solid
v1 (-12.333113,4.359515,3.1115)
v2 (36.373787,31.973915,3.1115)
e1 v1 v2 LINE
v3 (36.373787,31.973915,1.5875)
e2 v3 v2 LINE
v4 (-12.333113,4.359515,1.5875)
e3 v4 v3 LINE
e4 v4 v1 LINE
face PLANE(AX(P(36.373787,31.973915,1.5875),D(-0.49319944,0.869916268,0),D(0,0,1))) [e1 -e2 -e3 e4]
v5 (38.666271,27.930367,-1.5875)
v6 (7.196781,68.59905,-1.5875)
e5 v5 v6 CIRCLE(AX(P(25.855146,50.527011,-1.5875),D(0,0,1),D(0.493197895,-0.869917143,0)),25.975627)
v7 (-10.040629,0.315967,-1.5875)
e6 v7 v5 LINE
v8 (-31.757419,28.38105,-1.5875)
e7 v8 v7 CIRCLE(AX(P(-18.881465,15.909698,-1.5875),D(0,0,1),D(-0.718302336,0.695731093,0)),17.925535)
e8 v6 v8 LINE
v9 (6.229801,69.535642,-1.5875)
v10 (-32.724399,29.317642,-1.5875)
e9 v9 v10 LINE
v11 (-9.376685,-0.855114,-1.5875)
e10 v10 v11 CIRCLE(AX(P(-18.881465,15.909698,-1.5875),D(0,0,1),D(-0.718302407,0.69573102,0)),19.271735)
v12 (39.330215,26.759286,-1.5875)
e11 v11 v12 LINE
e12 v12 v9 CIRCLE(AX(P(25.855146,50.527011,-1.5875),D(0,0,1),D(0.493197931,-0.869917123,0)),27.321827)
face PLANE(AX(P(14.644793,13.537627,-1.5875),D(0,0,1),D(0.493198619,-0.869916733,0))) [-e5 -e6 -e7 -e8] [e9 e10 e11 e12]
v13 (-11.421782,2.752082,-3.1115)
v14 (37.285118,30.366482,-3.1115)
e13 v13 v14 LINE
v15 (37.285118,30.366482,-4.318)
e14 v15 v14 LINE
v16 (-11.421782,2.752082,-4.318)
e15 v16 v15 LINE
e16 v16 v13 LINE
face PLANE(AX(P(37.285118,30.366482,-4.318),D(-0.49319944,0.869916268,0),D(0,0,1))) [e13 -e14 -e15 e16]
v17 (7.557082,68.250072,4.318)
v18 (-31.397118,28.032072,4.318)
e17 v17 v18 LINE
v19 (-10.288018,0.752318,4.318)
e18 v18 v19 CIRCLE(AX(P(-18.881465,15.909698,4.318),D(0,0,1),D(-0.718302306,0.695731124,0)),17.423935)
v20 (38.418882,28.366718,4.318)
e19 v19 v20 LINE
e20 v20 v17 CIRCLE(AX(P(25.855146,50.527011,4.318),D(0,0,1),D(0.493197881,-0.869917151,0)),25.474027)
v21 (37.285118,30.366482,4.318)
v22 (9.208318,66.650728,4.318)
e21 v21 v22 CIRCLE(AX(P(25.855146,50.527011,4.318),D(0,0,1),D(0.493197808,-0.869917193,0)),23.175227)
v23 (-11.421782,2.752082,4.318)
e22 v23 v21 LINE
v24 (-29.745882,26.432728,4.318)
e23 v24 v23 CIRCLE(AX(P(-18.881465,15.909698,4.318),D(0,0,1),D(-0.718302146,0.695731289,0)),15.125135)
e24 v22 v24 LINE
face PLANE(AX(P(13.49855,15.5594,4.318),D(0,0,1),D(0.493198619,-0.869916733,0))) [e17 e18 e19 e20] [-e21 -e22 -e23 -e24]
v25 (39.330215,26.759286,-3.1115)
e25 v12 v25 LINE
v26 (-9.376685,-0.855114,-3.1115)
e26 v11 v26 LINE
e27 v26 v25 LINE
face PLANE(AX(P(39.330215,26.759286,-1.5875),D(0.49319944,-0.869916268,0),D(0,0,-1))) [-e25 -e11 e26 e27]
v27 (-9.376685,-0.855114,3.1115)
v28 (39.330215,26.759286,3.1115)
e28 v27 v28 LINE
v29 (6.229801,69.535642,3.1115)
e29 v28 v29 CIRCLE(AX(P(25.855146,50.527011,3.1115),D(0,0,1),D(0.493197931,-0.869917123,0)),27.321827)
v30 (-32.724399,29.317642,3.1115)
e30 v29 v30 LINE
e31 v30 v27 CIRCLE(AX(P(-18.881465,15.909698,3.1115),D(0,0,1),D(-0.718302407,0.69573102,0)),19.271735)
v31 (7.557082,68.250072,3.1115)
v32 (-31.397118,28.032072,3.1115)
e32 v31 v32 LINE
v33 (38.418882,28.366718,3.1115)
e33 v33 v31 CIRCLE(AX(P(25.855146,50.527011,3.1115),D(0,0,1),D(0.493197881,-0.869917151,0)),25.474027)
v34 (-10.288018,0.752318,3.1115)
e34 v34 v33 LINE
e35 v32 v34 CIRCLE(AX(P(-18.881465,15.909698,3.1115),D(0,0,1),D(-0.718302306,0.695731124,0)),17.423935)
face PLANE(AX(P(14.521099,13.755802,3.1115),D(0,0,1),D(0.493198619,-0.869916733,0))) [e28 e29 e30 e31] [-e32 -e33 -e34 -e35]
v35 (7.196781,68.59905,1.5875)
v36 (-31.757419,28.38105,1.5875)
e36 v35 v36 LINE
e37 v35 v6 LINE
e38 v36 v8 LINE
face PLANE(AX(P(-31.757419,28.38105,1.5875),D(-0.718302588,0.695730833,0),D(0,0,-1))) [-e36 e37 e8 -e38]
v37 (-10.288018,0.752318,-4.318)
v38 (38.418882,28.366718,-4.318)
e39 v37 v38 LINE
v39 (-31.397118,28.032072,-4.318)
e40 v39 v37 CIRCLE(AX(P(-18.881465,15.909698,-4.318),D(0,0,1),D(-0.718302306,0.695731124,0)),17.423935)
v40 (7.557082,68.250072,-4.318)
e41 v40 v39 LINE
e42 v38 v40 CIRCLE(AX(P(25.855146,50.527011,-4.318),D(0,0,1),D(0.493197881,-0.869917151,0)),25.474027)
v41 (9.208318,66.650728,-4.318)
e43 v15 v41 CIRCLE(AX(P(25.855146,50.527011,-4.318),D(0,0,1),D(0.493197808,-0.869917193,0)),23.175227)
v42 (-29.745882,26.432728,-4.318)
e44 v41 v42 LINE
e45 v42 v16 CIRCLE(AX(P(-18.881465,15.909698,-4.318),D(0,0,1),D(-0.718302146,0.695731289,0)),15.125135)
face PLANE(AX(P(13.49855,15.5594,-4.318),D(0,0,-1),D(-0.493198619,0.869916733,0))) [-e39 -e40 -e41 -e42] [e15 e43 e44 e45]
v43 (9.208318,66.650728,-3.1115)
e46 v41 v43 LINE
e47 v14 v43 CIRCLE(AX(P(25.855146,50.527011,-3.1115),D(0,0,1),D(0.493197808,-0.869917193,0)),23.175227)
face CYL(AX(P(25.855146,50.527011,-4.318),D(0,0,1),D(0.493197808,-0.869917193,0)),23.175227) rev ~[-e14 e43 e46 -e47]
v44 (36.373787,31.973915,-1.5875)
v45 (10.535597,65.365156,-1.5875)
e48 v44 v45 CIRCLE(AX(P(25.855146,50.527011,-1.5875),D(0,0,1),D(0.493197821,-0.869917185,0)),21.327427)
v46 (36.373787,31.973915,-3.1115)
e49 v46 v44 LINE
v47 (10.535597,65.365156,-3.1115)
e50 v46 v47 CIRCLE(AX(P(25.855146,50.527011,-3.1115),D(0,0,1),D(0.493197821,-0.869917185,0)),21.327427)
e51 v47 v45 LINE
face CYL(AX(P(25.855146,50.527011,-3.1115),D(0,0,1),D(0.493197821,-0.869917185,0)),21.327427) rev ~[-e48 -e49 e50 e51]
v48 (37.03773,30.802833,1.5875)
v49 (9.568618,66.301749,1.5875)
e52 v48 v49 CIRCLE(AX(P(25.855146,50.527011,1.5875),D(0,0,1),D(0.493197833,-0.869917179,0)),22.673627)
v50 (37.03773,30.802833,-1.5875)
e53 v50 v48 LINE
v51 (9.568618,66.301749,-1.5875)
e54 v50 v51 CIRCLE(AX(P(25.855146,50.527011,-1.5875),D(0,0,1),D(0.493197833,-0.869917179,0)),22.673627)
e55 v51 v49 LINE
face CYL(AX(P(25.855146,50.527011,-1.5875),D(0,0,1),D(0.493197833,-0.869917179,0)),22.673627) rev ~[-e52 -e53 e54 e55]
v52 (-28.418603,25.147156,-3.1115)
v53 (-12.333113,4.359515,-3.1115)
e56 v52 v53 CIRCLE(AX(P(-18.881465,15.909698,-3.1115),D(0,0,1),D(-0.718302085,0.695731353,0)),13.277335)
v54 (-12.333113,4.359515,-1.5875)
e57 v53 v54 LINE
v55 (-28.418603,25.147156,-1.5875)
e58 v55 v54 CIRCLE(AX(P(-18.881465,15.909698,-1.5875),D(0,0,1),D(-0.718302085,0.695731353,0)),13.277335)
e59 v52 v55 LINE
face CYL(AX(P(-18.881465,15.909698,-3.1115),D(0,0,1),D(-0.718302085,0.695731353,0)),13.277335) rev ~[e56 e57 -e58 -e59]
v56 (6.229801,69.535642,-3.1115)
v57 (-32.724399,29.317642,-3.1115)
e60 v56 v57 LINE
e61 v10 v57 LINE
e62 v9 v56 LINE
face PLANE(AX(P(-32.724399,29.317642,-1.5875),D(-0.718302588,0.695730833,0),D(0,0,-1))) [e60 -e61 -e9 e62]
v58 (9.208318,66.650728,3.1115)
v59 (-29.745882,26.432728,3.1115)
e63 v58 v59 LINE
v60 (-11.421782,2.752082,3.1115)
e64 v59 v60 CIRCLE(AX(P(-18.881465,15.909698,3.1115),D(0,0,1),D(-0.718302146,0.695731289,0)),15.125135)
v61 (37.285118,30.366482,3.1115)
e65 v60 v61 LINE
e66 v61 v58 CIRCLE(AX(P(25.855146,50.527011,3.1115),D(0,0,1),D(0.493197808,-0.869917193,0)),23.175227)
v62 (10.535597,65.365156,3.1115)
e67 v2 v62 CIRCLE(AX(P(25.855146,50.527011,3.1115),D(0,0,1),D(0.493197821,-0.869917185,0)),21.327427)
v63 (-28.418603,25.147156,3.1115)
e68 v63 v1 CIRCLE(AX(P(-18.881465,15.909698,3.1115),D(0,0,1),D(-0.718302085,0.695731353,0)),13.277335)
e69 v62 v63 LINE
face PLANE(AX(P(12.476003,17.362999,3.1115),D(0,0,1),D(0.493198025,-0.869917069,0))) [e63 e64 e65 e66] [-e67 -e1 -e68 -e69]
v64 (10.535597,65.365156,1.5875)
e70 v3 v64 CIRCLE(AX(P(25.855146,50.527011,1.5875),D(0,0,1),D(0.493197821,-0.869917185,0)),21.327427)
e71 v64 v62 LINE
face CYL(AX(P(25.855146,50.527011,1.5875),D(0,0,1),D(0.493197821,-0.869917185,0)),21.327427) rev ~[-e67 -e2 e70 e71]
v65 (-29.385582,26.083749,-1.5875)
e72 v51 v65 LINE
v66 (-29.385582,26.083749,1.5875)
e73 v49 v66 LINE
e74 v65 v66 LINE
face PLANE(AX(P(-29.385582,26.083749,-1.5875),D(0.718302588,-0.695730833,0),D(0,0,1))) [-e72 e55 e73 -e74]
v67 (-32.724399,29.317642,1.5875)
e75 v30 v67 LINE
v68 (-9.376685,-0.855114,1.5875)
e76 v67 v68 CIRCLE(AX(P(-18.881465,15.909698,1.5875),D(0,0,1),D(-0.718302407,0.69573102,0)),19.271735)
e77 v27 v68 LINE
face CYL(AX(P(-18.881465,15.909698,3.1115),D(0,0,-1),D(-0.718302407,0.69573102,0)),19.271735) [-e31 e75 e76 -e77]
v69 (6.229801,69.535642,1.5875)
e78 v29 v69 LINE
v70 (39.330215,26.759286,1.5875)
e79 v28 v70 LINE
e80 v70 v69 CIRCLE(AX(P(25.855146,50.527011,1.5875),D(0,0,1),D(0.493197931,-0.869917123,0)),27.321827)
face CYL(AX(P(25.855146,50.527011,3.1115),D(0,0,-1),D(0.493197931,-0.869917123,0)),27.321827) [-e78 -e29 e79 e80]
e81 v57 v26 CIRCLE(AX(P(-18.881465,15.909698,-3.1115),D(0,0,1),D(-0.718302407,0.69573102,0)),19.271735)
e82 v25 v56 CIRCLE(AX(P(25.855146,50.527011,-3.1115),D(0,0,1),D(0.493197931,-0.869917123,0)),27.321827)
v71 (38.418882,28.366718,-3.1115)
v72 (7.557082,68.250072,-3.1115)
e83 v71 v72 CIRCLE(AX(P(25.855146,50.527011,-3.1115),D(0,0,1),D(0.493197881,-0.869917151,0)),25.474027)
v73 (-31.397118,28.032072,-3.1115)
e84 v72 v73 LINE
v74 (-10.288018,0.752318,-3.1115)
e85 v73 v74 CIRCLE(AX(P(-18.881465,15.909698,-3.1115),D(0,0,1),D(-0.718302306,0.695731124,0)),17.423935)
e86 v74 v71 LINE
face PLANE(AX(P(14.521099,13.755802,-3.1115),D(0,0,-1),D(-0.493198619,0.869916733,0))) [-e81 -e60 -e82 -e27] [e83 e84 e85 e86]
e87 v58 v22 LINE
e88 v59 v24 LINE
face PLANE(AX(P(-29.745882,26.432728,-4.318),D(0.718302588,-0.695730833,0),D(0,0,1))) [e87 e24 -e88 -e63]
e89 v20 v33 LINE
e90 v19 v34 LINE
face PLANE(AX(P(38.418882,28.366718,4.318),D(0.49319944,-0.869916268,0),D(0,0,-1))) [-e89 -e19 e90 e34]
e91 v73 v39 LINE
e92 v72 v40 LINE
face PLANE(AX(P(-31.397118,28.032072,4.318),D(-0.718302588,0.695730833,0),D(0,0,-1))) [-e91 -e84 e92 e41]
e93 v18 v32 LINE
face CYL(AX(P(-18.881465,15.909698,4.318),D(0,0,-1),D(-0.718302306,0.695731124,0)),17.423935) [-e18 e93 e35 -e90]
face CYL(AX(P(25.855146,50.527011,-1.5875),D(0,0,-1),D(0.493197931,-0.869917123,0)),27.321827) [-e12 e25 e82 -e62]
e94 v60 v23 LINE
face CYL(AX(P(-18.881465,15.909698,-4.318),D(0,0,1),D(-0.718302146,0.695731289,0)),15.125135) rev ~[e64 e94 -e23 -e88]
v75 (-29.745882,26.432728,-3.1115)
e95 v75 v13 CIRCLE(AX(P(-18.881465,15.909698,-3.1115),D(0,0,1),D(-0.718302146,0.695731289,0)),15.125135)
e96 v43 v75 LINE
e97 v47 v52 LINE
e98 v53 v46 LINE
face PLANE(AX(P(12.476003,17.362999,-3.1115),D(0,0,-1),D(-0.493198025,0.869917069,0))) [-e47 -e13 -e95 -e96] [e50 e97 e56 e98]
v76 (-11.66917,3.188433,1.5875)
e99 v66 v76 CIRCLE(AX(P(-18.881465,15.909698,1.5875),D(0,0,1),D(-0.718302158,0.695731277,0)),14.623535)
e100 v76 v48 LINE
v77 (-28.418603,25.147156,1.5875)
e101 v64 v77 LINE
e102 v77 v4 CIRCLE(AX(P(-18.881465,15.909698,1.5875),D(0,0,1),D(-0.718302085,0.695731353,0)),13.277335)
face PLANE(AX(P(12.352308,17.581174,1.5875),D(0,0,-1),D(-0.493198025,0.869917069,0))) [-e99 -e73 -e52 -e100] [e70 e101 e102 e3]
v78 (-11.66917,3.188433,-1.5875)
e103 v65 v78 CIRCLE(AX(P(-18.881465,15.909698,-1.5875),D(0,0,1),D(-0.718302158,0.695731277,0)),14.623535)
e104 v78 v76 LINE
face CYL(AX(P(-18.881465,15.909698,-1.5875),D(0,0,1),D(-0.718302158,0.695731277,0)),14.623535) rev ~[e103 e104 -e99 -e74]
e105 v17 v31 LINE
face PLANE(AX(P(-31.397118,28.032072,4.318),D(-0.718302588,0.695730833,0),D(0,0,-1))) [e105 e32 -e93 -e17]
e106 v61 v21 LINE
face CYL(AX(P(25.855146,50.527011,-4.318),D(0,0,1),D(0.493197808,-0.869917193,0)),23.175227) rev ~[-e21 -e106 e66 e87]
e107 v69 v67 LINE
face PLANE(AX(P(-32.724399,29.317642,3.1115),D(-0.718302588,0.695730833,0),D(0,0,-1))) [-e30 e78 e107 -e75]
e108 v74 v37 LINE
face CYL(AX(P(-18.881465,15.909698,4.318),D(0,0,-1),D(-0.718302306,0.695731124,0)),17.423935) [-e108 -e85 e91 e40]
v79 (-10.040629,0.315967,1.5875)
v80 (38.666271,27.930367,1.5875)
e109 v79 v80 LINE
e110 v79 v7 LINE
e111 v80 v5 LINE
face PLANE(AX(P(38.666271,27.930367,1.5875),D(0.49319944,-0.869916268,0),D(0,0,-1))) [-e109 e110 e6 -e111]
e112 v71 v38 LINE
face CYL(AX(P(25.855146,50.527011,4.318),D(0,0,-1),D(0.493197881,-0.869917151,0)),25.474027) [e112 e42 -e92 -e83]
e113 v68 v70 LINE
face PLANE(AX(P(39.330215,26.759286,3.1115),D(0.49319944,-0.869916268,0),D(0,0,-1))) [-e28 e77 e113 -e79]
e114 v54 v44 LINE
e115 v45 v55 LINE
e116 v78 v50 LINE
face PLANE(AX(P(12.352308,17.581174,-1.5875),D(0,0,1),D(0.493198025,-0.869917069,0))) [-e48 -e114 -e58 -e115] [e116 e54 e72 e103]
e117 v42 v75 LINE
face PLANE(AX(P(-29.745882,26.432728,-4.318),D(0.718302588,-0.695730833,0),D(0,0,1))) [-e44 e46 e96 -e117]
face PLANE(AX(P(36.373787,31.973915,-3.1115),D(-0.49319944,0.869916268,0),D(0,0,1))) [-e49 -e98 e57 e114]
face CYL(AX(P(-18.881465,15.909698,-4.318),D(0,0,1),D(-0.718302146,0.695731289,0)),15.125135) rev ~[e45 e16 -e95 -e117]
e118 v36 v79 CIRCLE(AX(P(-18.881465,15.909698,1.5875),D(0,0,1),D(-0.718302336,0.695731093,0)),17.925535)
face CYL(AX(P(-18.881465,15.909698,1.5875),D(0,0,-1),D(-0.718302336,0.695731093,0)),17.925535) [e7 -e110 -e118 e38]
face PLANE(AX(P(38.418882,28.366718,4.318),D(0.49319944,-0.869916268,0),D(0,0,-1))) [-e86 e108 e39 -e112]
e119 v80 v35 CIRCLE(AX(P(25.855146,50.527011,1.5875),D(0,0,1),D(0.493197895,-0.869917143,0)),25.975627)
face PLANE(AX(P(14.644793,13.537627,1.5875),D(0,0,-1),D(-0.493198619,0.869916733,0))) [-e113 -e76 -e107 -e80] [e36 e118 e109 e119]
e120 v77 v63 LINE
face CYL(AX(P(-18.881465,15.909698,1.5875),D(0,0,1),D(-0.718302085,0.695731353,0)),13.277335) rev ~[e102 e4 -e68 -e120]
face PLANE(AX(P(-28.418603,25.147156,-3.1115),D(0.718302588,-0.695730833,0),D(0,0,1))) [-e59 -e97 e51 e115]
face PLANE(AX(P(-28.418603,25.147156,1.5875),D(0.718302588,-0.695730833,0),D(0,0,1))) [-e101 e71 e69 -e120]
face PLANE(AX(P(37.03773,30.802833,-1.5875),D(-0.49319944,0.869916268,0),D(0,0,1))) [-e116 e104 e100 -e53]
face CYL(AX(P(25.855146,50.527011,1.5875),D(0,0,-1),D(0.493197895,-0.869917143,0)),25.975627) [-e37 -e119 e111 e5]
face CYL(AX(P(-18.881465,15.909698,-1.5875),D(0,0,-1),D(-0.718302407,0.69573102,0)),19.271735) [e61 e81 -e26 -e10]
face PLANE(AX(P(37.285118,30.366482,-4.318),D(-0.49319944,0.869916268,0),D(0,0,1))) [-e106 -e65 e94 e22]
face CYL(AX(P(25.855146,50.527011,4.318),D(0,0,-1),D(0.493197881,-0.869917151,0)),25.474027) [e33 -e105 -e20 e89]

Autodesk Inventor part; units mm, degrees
ref_plane "РабПлоскость2" through (-18.8815, 15.9097, 0) normal (-1, 0, 0) x (0, 0, 1)
ref_plane "РабПлоскость3" through (25.8552, 50.527, 0) normal (-0.7364465, -0.6764958, 0) x (0, 0, 1)
sketch "Траектория" plane through (0, 0, 0) normal (0, 0, 1) x (1, 0, 0)
  arc A0 (-30.5715, 27.2324) -> (-10.8549, 1.7522) centre (-18.8815, 15.9097) ccw
  arc A1 (37.852, 29.3666) -> (8.3827, 67.4504) centre (25.8552, 50.527) ccw
  line L0 (37.852, 29.3666) -> (-10.8549, 1.7522)
  line L1 (-30.5715, 27.2324) -> (8.3827, 67.4504)
  dimension "d31" = 5.9944
ref_plane "Секущая плоскость" through (-10.8549, 1.7522, 0) normal (0.8699167, 0.4931986, 0) x (0, 0, 1)
sketch "Эскиз сечения" plane through (-10.8549, 1.7522, 0) normal (0.8699167, 0.4931986, 0) x (0, 0, 1)
  line L0 (-4.318, -1.1494) -> (4.318, -1.1494)
  line L1 (4.318, -1.1494) -> (4.318, 1.1494)
  line L2 (4.318, 1.1494) -> (-4.318, 1.1494)
  line L3 (-4.318, 1.1494) -> (-4.318, -1.1494)
  line L4 (-1.5875, -1.651) -> (1.5875, -1.651)
  line L5 (1.5875, -1.651) -> (1.5875, 1.651)
  line L6 (1.5875, 1.651) -> (-1.5875, 1.651)
  line L7 (-1.5875, 1.651) -> (-1.5875, -1.651)
  line L8 (-1.5875, 0) -> (1.5875, 0) construction
  line L9 (-3.1115, -2.9972) -> (-1.5875, -2.9972)
  line L10 (-1.5875, -2.9972) -> (-1.5875, 2.9972)
  line L11 (-1.5875, 2.9972) -> (-3.1115, 2.9972)
  line L12 (-3.1115, 2.9972) -> (-3.1115, -2.9972)
  line L13 (1.5875, -2.9972) -> (3.1115, -2.9972)
  line L14 (3.1115, -2.9972) -> (3.1115, 2.9972)
  line L15 (3.1115, 2.9972) -> (1.5875, 2.9972)
  line L16 (1.5875, 2.9972) -> (1.5875, -2.9972)
  line L17 (-4.318, 0) -> (4.318, 0) construction
  point P0 (0, 0)
  point P1 (0, 0)
  dimension "d21" = 2.2987
  dimension "d22" = 3.302
  dimension "d23" = 3.175
  dimension "d24" = 1.524
  dimension "d31" = 5.9944
  dimension "d32" = 8.636
sweep "Тело" add profiles "Эскиз сечения" path "Траектория"
pattern_of_one "Strand Pattern"
equation "\"d21\" = da_d2"
equation "\"d22\" = da_d1"
equation "\"d23\" = da_b1"
equation "\"d24\" = da_t1 + da_t2"
equation "\"d30\" = da_pt"
equation "\"da_p\" = 6.35"
equation "\"da_b1\" = 3.175"
equation "\"da_h2\" = 5.9944"
equation "\"da_h3\" = 5.207"
equation "\"da_d1\" = 3.302"
equation "\"da_d2\" = 2.2987"
equation "\"da_pt\" = 6.4008"
equation "\"da_b\" = 8.636"
equation "\"da_t1\" = 0.762"
equation "\"da_t2\" = 0.762"
properties part number "Цепь роликовая"
